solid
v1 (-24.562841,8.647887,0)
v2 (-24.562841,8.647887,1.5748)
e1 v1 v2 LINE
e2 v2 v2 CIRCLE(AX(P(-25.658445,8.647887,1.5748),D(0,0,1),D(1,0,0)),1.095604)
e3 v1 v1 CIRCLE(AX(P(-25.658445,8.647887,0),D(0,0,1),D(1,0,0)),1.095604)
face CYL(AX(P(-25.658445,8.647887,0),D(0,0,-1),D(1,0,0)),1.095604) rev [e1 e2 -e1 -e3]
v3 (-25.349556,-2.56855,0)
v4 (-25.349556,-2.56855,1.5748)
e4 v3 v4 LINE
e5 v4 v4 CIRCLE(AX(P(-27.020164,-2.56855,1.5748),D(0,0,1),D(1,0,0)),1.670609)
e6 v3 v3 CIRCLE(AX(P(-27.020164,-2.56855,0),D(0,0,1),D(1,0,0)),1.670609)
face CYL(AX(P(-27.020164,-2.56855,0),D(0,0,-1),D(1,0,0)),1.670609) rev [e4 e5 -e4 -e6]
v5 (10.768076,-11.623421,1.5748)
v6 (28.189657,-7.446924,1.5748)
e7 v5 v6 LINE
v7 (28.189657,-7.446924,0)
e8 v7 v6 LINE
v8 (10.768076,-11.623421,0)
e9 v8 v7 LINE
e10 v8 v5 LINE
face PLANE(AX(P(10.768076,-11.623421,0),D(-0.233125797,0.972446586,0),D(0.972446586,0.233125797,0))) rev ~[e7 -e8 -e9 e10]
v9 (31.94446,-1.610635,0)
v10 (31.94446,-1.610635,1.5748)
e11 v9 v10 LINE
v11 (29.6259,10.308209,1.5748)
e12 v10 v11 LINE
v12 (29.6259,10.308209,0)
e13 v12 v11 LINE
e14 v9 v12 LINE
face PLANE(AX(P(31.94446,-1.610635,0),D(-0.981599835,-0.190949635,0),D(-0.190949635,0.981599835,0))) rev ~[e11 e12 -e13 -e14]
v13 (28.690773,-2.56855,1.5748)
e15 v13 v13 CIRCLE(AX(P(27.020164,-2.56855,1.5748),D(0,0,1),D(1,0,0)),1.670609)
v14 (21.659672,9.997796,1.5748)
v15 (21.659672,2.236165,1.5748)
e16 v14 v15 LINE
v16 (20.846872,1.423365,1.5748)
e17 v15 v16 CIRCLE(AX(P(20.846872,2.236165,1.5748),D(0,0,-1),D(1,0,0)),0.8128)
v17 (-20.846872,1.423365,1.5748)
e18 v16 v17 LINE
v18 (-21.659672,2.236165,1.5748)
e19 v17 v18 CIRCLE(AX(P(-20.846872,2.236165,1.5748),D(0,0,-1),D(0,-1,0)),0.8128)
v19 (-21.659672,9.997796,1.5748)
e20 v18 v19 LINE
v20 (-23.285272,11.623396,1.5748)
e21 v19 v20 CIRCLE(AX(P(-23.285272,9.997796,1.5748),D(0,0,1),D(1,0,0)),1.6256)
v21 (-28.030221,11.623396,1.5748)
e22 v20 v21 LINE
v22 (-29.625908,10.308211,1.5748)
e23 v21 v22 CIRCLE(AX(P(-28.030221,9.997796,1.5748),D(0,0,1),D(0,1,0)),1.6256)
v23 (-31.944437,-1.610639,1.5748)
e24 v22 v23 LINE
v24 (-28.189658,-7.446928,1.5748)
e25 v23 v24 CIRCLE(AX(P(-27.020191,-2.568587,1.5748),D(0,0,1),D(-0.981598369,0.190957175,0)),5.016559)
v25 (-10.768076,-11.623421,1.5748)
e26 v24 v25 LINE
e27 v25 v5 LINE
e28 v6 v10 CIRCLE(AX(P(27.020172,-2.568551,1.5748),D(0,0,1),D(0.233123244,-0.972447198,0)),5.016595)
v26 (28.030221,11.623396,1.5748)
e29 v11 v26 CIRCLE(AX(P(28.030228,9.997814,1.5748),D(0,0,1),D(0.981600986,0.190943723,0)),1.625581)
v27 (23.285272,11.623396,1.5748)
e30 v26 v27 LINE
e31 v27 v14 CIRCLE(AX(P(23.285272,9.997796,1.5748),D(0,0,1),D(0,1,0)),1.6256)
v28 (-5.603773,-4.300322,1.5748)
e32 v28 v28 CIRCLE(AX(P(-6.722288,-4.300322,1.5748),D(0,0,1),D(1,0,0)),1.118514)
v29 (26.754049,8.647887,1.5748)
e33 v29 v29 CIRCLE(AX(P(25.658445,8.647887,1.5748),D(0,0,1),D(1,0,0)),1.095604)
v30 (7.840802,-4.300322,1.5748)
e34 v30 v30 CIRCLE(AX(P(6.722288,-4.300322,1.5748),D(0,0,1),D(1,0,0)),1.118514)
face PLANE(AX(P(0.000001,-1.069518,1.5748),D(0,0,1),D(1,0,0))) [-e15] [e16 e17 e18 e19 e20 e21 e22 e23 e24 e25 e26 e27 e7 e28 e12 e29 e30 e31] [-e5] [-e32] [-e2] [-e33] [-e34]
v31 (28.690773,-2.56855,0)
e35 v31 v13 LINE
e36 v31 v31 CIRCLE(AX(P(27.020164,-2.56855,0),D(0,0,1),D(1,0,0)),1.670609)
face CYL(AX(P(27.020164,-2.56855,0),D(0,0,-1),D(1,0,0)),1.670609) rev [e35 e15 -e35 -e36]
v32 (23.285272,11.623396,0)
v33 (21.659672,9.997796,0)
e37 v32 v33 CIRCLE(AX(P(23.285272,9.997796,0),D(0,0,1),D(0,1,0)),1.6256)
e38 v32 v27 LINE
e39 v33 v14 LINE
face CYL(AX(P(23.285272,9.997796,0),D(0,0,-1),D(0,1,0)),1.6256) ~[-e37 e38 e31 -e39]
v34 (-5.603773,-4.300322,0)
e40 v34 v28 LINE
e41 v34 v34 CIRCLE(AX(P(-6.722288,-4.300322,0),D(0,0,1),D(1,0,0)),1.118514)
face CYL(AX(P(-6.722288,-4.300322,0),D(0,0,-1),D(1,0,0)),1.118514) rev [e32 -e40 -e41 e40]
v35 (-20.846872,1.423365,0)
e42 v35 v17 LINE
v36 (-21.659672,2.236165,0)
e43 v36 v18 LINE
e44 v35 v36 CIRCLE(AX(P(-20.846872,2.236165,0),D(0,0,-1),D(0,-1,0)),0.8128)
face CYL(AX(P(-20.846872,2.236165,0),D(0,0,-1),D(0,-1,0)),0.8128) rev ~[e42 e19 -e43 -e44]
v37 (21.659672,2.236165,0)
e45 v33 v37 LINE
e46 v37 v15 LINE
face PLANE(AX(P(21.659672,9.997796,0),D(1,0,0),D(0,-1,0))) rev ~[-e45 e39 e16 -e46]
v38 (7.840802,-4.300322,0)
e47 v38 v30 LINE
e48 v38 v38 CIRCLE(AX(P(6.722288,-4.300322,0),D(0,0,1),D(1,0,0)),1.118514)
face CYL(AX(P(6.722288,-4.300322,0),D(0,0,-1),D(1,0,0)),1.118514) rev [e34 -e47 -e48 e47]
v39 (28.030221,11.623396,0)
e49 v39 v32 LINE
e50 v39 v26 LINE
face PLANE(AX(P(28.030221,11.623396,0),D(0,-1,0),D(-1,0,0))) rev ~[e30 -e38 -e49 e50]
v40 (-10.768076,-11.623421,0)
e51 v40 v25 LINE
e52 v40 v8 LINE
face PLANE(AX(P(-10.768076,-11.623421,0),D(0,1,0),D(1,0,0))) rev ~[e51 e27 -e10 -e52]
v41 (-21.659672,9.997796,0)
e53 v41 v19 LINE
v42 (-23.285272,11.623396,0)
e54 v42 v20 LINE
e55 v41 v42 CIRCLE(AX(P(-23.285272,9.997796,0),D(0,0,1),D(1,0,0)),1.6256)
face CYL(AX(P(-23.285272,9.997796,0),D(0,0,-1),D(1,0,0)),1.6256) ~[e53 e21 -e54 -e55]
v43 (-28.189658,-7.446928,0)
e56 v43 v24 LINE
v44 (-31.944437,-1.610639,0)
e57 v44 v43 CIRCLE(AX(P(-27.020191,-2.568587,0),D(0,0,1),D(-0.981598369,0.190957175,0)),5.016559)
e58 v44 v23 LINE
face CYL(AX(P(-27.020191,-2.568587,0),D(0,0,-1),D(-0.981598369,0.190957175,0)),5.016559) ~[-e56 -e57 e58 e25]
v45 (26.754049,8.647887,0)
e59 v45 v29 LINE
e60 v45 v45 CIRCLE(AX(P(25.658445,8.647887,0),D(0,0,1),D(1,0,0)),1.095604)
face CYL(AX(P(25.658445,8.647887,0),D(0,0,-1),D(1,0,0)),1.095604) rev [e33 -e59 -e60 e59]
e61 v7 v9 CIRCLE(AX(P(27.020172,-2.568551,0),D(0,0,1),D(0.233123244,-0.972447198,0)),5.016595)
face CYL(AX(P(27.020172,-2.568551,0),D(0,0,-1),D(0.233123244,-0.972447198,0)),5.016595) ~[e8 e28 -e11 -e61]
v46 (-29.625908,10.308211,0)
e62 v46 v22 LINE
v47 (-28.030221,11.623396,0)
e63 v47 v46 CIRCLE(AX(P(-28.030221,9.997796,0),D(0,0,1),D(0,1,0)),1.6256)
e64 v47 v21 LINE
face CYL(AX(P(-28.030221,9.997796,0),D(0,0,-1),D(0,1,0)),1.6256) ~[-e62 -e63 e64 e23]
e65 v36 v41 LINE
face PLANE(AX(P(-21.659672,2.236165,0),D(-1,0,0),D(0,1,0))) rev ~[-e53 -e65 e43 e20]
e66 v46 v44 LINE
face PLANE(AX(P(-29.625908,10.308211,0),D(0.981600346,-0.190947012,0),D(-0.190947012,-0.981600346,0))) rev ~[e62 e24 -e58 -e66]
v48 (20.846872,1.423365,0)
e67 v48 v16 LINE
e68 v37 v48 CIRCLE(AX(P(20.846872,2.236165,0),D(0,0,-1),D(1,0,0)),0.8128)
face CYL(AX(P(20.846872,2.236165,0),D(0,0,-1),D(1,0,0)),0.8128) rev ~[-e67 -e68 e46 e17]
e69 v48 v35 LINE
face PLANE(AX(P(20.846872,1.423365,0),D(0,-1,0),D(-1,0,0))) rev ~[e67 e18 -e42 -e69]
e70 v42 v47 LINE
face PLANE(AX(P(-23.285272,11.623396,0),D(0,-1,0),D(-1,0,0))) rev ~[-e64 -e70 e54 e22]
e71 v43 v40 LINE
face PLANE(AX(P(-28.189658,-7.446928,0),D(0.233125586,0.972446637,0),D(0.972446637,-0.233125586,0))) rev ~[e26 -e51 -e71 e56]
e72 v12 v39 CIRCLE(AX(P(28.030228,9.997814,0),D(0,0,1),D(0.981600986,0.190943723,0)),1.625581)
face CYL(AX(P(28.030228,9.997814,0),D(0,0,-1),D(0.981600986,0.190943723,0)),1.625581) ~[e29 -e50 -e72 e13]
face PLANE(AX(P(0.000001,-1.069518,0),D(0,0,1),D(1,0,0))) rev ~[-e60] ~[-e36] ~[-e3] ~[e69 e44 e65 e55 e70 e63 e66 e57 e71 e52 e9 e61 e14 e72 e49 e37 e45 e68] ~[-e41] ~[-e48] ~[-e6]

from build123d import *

# Parameters (mm, degrees)
F0_R     = 1.6706088
F0_R_2   = 1.1185144
F0_R_3   = 1.0956036
F1_DEPTH = 1.5748


# Not quite as in the source:
# - ends of sketch curves that miss each other by under 0.0002 mm in the source are joined


with BuildPart() as f1:
    # F0 (on Top) → F1 (new body)
    with BuildSketch(Plane.XY):
        with BuildLine():
            Line((-23.2852722, 11.6233956), (-25.6565654, 11.6233956))
            Line((-25.6565654, 11.6233956), (-28.0302208, 11.6233956))
            ThreePointArc((-28.0302208, 11.6233956), (-29.0641368167, 11.2522249645), (-29.6259080683, 10.3082106474))
            Line((-29.6259080683, 10.3082106474), (-31.944437, -1.6106394))
            ThreePointArc((-31.944437, -1.6106394), (-31.2390678474, -5.2827981728), (-28.1896575043, -7.446928172))
            Line((-28.1896575043, -7.446928172), (-10.768076, -11.623421))
            Line((-10.768076, -11.623421), (0, -11.623421))
            Line((0, -11.623421), (10.768076, -11.623421))
            Line((10.768076, -11.623421), (28.1896566, -7.4469244))
            ThreePointArc((28.1896566, -7.4469244), (31.2390678474, -5.2827981728), (31.9444603849, -1.610634851))
            Line((31.9444603849, -1.610634851), (29.6258996, 10.308209))
            ThreePointArc((29.6258996, 10.308209), (29.0641368167, 11.2522249645), (28.0302208, 11.6233956))
            Line((28.0302208, 11.6233956), (25.6565654, 11.6233956))
            Line((25.6565654, 11.6233956), (23.2852722, 11.6233956))
            ThreePointArc((23.2852722, 11.6233956), (22.1357994165, 11.1472683835), (21.6596722, 9.9977956))
            Line((21.6596722, 9.9977956), (21.6596722, 2.2361652))
            ThreePointArc((21.6596722, 2.2361652), (21.4216085917, 1.6614288083), (20.8468722, 1.4233652))
            Line((20.8468722, 1.4233652), (0, 1.4233652))
            Line((0, 1.4233652), (-20.8468722, 1.4233652))
            ThreePointArc((-20.8468722, 1.4233652), (-21.4216085917, 1.6614288083), (-21.6596722, 2.2361652))
            Line((-21.6596722, 2.2361652), (-21.6596722, 9.9977956))
            ThreePointArc((-21.6596722, 9.9977956), (-22.1357994165, 11.1472683835), (-23.2852722, 11.6233956))
        make_face()
        with Locations((-27.0201644, -2.5685496)):
            Circle(F0_R, mode=Mode.SUBTRACT)
        with Locations((-6.7222878, -4.3003216)):
            Circle(F0_R_2, mode=Mode.SUBTRACT)
        with Locations((6.7222878, -4.3003216)):
            Circle(F0_R_2, mode=Mode.SUBTRACT)
        with Locations((27.0201644, -2.5685496)):
            Circle(F0_R, mode=Mode.SUBTRACT)
        with Locations((-25.658445, 8.6478872)):
            Circle(F0_R_3, mode=Mode.SUBTRACT)
        with Locations((25.658445, 8.6478872)):
            Circle(F0_R_3, mode=Mode.SUBTRACT)
    extrude(amount=F1_DEPTH)


solid = f1.part
